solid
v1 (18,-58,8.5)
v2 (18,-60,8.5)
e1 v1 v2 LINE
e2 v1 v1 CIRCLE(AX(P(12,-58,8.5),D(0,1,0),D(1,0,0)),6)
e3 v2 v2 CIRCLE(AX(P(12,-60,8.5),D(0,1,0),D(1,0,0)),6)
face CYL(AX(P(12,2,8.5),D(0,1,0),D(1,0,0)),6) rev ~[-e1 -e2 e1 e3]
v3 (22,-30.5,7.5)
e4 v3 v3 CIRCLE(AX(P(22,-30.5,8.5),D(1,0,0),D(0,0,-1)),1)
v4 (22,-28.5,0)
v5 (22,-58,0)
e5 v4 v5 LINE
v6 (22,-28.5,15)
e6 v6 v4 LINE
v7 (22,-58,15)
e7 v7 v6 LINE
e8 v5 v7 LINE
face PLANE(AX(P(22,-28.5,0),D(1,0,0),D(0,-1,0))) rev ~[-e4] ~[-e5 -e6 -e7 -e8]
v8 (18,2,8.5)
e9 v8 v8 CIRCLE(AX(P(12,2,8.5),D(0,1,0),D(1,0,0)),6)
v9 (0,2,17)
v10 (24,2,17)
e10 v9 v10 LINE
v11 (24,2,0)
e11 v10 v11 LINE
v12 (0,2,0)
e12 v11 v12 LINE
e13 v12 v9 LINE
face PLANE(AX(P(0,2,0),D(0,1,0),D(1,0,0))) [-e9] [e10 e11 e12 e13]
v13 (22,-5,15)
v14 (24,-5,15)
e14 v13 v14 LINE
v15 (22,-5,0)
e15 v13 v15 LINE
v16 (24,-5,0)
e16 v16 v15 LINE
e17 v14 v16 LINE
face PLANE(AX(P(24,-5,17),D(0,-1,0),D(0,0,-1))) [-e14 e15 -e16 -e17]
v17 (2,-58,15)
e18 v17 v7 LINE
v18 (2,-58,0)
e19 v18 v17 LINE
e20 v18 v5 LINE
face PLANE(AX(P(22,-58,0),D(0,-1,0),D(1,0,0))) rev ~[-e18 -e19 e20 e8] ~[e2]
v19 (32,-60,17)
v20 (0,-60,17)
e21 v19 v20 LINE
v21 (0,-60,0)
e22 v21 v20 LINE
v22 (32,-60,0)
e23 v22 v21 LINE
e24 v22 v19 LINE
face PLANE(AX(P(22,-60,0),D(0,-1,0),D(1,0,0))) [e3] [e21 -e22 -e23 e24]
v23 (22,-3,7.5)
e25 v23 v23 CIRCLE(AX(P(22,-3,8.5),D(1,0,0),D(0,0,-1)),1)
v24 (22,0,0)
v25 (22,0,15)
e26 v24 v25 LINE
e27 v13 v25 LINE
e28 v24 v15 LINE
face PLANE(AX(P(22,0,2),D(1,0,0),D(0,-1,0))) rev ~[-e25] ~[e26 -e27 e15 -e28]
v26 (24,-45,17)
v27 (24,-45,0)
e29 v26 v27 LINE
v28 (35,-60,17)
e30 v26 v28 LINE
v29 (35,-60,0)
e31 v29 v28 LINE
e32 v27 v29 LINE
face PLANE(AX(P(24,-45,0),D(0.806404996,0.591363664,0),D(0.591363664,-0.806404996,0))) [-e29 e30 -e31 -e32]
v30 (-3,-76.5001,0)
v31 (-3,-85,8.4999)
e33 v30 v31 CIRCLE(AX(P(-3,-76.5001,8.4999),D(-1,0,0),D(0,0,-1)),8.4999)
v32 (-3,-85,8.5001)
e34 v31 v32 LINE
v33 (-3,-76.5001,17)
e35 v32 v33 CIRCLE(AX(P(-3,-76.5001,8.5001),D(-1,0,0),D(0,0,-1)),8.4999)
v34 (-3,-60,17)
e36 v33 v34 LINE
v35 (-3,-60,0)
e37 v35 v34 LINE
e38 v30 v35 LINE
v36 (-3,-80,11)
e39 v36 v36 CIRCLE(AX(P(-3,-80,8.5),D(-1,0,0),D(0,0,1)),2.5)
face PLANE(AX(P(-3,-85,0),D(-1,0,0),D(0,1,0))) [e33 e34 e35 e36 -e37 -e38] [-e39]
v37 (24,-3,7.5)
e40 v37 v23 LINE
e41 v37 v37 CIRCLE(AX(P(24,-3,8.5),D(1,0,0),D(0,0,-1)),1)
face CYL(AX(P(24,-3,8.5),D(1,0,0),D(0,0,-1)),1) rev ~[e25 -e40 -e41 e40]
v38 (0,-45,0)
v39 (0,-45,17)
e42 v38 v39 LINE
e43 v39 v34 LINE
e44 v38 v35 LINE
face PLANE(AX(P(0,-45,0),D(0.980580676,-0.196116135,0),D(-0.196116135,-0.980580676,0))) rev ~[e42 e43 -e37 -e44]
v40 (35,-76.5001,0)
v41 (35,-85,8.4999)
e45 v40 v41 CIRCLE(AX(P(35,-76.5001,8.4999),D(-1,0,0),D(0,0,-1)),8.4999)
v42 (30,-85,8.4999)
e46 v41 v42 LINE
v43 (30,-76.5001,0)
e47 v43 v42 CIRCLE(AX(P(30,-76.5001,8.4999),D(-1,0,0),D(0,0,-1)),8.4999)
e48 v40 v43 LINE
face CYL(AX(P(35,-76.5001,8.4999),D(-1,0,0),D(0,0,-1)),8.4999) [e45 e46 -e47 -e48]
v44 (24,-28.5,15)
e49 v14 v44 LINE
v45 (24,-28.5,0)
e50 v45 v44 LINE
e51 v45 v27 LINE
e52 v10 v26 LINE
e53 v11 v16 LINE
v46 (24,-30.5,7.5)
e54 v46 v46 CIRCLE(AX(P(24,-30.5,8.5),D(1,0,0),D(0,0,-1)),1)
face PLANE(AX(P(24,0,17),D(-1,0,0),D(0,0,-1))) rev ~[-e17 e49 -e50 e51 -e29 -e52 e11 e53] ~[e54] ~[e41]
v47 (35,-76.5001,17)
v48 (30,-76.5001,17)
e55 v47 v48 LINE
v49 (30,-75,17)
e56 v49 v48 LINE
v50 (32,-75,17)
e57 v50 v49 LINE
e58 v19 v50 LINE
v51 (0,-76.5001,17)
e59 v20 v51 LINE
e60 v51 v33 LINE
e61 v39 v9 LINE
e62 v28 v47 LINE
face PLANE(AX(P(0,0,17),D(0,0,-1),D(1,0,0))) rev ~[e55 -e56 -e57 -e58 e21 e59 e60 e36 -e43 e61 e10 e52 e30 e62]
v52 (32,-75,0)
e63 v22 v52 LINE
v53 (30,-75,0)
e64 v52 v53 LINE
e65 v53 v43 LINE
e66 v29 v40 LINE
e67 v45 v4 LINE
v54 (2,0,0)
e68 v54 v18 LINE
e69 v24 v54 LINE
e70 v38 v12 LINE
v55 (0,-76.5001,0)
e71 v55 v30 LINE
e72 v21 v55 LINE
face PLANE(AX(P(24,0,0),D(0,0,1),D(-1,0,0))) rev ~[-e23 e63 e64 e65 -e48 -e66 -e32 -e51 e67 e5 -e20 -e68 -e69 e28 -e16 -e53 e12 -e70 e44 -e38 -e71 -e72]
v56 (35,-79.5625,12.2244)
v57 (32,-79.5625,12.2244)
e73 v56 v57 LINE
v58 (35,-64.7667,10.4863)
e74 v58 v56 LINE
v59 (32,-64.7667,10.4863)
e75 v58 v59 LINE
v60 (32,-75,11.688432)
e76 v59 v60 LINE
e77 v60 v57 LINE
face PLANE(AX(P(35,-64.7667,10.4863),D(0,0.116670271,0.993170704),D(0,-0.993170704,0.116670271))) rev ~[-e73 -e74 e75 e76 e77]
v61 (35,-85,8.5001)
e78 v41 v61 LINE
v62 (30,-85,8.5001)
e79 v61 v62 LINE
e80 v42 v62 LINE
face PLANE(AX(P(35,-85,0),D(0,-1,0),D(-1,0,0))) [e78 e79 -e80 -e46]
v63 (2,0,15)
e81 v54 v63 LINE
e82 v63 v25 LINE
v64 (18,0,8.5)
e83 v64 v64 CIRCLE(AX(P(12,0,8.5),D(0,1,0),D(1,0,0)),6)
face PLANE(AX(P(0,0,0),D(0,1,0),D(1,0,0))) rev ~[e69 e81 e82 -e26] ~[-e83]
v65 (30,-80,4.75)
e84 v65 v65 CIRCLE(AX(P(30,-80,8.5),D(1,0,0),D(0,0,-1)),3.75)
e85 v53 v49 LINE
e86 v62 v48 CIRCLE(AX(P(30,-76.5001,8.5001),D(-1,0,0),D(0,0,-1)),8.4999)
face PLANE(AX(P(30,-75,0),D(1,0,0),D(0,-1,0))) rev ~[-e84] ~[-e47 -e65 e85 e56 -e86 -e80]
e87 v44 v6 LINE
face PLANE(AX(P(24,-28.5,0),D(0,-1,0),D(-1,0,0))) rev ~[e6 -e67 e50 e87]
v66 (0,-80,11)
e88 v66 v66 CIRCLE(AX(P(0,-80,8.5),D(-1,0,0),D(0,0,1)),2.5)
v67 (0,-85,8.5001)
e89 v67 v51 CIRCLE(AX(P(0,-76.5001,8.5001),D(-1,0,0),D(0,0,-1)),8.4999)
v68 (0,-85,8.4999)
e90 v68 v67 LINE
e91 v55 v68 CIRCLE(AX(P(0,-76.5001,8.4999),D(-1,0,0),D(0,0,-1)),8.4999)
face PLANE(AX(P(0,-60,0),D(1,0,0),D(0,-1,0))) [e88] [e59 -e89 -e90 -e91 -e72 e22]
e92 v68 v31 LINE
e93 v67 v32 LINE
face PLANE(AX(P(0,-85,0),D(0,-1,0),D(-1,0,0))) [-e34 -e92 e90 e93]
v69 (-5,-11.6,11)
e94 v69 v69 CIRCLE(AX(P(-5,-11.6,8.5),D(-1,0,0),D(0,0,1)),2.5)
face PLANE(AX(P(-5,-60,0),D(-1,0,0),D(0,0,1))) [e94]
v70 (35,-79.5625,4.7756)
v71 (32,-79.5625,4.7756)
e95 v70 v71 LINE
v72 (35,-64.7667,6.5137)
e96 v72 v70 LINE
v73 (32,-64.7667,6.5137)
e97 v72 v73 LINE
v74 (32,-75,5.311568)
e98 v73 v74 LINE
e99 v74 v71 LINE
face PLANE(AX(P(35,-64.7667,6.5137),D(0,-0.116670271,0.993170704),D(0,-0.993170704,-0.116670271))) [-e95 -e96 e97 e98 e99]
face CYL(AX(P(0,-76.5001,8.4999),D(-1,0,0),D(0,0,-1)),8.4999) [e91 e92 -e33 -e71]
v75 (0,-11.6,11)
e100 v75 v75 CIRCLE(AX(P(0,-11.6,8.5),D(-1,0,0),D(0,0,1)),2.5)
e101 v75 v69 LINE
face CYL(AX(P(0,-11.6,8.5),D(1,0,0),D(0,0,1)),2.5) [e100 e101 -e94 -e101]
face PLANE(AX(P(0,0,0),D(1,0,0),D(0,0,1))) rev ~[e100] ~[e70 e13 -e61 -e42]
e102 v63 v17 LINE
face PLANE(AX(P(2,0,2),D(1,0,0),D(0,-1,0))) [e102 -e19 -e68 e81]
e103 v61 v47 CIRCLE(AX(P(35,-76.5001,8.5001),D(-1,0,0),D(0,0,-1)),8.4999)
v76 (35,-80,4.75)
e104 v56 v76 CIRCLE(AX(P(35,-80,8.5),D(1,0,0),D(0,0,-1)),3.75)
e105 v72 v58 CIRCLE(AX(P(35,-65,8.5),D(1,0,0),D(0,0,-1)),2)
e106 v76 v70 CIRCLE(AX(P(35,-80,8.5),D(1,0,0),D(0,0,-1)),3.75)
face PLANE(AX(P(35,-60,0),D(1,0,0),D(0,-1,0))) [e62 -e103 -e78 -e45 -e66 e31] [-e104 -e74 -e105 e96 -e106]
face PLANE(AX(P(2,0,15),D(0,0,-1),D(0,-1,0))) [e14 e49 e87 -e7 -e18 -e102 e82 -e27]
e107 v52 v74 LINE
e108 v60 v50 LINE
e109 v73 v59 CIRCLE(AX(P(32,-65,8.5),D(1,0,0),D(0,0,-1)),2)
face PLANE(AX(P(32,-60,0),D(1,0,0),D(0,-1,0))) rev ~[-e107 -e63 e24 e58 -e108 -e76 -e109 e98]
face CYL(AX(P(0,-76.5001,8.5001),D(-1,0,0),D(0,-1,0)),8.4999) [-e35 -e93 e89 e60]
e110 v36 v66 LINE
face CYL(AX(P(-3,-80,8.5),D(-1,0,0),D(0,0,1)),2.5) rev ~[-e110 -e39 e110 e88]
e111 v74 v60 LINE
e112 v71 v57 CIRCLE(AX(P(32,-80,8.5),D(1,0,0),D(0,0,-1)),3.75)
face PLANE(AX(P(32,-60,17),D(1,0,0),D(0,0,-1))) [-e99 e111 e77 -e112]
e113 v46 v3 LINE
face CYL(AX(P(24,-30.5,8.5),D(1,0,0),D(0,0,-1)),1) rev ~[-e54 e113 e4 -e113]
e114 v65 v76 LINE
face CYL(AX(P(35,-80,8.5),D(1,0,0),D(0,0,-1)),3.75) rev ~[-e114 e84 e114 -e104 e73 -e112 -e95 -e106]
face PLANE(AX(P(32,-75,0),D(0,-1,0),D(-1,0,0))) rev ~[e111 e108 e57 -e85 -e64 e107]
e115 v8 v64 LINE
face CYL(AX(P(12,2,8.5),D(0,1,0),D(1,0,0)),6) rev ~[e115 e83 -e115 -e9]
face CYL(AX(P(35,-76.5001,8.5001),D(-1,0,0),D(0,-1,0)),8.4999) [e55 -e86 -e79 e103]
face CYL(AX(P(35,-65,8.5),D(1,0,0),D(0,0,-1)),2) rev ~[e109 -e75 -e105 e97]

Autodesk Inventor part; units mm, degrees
ref_plane "YZ Plane" through (0, 0, 0) normal (1, 0, 0) x (0, 1, 0)
ref_plane "XZ Plane" through (0, 0, 0) normal (0, 1, 0) x (-1, 0, 0)
ref_plane "XY Plane" through (0, 0, 0) normal (0, 0, 1) x (1, 0, 0)
sketch "Sketch1" plane through (0, 0, 0) normal (0, 0, 1) x (1, 0, 0)
  line L0 (0, 0) -> (24, 0)
  line L1 (24, 0) -> (24, -60)
  line L2 (24, -60) -> (0, -60)
  line L3 (0, -60) -> (0, 0)
  dimension "d0" = 24
  dimension "d1" = 60
extrude "Extrusion1" add sketch "Sketch1" along normal blind 2
sketch "Sketch2" plane through (0, 0, 2) normal (0, 0, 1) x (1, 0, 0)
  line L0 (0, -60) -> (24, -60) projected
  line L1 (0, 0) -> (2, 0)
  line L2 (2, 0) -> (2, -60)
  line L3 (2, -60) -> (0, -60)
  line L4 (0, -60) -> (0, 0)
  line L5 (24, -60) -> (24, 0) projected
  line L6 (24, 0) -> (22, 0)
  line L7 (22, 0) -> (22, -60)
  line L8 (22, -60) -> (24, -60)
  line L9 (24, -60) -> (24, 0)
  dimension "d4" = 2
  dimension "d5" = 2
extrude "Extrusion2" add sketch "Sketch2" along normal blind 15
sketch "Sketch3" plane through (24, -60, 0) normal (1, 0, 0) x (0, 0, -1)
  circle A0 centre (-8.5, 57) radius 1
  circle A1 centre (-8.5, 29.5) radius 1
  line L0 (-17, 0) -> (-17, 60) projected
  line L1 (0, 60) -> (-17, 60) projected
  dimension "d8" = 2
  dimension "d9" = 2
  dimension "d10" = 8.5
  dimension "d11" = 8.5
  dimension "d12" = 27.5
  dimension "d13" = 3
extrude "Extrusion3" cut sketch "Sketch3" against normal up to surface (2 mm away)
sketch "Sketch4" plane through (24, -60, 0) normal (1, 0, 0) x (0, 0, -1)
  line L0 (-17, 60) -> (-17, 0) projected
  line L1 (-17, 55) -> (-2, 55)
  line L2 (-2, 55) -> (-2, 31.5)
  line L3 (-2, 31.5) -> (-17, 31.5)
  line L4 (-17, 31.5) -> (-17, 55)
  circle A0 centre (-8.5, 57) radius 1 projected
  circle A1 centre (-8.5, 29.5) radius 1 projected
  point P0 (-17, 31.5)
  dimension "d23" = 15
  dimension "d24" = 23.5
  dimension "d25" = 2
  dimension "d26" = 2
extrude "Extrusion4" cut sketch "Sketch4" against normal up to surface (2 mm away) contours L1 L2 L3 L0
sketch "Sketch5" plane through (0, -60, 0) normal (-1, 0, 0) x (0, 0, 1)
  circle A0 centre (8.5, 48.4) radius 2.5
  circle A1 centre (8.5, 57) radius 1 projected
  point P0 (0, 60)
  dimension "d29" = 5
  dimension "d32" = 8.6
  dimension "d33" = 0
extrude "Extrusion5" add sketch "Sketch5" along normal blind 5 contours A0
sketch "Sketch12" plane through (0, 0, 0) normal (0, 0, -1) x (-1, 0, 0)
  line L0 (3, -60) -> (-35, -60)
  line L1 (-35, -60) -> (-35, -85)
  line L2 (-35, -85) -> (3, -85)
  line L3 (3, -85) -> (3, -60)
  line L4 (0, 0) -> (0, -60) projected
  line L5 (-2, -60) -> (-22, -60) projected
  line L6 (3, -60) -> (0, -60)
  line L7 (0, -60) -> (0, -85)
  line L8 (0, -85) -> (3, -85)
  line L9 (3, -85) -> (3, -60)
  line L10 (-35, -60) -> (-30, -60)
  line L11 (-30, -60) -> (-30, -85)
  line L12 (-30, -85) -> (-35, -85)
  line L13 (-35, -85) -> (-35, -60)
  line L14 (-30, -60) -> (-32, -60)
  line L15 (-32, -60) -> (-32, -75)
  line L16 (-32, -75) -> (-30, -75)
  line L17 (-30, -75) -> (-30, -60)
  dimension "d51" = 38
  dimension "d52" = 3
  dimension "d53" = 25
  dimension "d54" = 0
  dimension "d55" = 3
  dimension "d56" = 5
  dimension "d95" = 2
  dimension "d96" = 15
extrude "Extrusion9" add sketch "Sketch12" against normal up to surface (17 mm away) contours L3 L2 L7 L0 | L2 L1 L0 L15 L16 L11
sketch "Sketch13" plane through (0, 0, 0) normal (0, 0, -1) x (-1, 0, 0)
  line L0 (-32, -60) -> (-35, -60) projected
  line L1 (0, -60) -> (-24, -60) projected
  line L2 (-35, -60) -> (-24, -60)
  line L3 (-24, -60) -> (-24, -45)
  line L4 (-24, -45) -> (-35, -60)
  line L5 (0, -60) -> (0, -45)
  line L6 (0, 0) -> (0, -60) projected
  line L7 (0, -60) -> (15, -60) construction
  line L8 (0, -45) -> (3, -60)
  line L9 (3, -60) -> (0, -60)
  point P0 (-30, -60)
  dimension "d59" = 15
  dimension "d60" = 90
  dimension "d63" = 15
  dimension "d64" = 90
extrude "Extrusion10" add sketch "Sketch13" against normal up to surface (17 mm away)
sketch "Sketch14" plane through (-3, -85, 0) normal (-1, 0, 0) x (0, 0, 1)
  circle A0 centre (8.5, 5) radius 2.5
  line L0 (17, 0) -> (17, 25) projected
  line L1 (0, 25) -> (17, 25) projected
  point P0 (0, 85)
  dimension "d65" = 5
  dimension "d66" = 8.5
  dimension "d67" = 20
extrude "Extrusion11" cut sketch "Sketch14" against normal up to surface (38 mm away)
sketch "Sketch15" plane through (2, -60, 2) normal (1, 0, 0) x (0, 0, -1)
  line L0 (2, 0) -> (-15, 0) projected
  line L1 (-15, 60) -> (-13, 60)
  line L2 (-13, 60) -> (-13, 0)
  line L3 (-13, 0) -> (-15, 0)
  line L4 (-15, 0) -> (-15, 60)
  point P0 (2, 60)
  dimension "d70" = 2
extrude "Extrusion12" add sketch "Sketch15" along normal up to surface (22 mm away)
sketch "Sketch16" plane through (0, 0, 0) normal (0, 0, -1) x (-1, 0, 0)
  line L0 (-2, 0) -> (-2, -60) projected
  line L1 (-2, -60) -> (-22, -60) projected
  line L2 (-2, 0) -> (-22, 0)
  line L3 (-22, 0) -> (-22, -60)
  line L4 (-22, -60) -> (-2, -60)
  line L5 (-2, -60) -> (-2, 0)
  line L6 (-24, -45) -> (-24, 0) projected
  line L7 (-24, -28.5) -> (-22, -28.5) projected
  line L8 (-24, -5) -> (-22, -5)
  line L9 (-22, -5) -> (-22, -28.5)
  line L10 (-22, -28.5) -> (-24, -28.5)
  line L11 (-24, -28.5) -> (-24, -5)
  point P0 (0, 0)
extrude "Extrusion14" cut sketch "Sketch16" against normal up to surface (2 mm away)
sketch "Sketch17" plane through (22, -60, 0) normal (0, -1, 0) x (1, 0, 0)
  line L0 (-20, 2) -> (-20, 15) projected
  line L1 (-20, 15) -> (0, 15) projected
  line L2 (-20, 0) -> (0, 0)
  line L3 (0, 0) -> (0, 15)
  line L4 (0, 15) -> (-20, 15)
  line L5 (-20, 15) -> (-20, 0)
  point P0 (-22, 0)
  point P1 (-20, 2)
extrude "Extrusion15" add sketch "Sketch17" against normal blind 2
sketch "Sketch18" plane through (0, 0, 0) normal (0, 1, 0) x (1, 0, 0)
  line L0 (0, 0) -> (0, -17) projected
  line L1 (24, -17) -> (24, 0) projected
  line L2 (0, -17) -> (24, -17)
  line L3 (24, -17) -> (24, 0)
  line L4 (24, 0) -> (0, 0)
  line L5 (0, 0) -> (0, -17)
extrude "Extrusion16" add sketch "Sketch18" along normal blind 2
sketch "Sketch19" plane through (0, 2, 0) normal (0, 1, 0) x (1, 0, 0)
  circle A0 centre (12, -8.5) radius 6
  line L0 (0, 0) -> (0, -17) projected
  line L1 (0, -17) -> (24, -17) projected
  dimension "d81" = 12
  dimension "d82" = 12
  dimension "d83" = 8.5
extrude "Extrusion17" cut sketch "Sketch19" against normal up to surface (62 mm away)
sketch "Sketch20" plane through (35, -85, 17) normal (1, 0, 0) x (0, 0, -1)
  circle A0 centre (8.5, 5) radius 2.5 projected
  circle A1 centre (8.5, 5) radius 3.75
  point P0 (17, 85)
  dimension "d86" = 7.5
extrude "Extrusion18" cut sketch "Sketch20" against normal up to surface (5 mm away)
fillet "Fillet2" radius 8.5 4 edges at (-1.5, -85, 0) (-1.5, -85, 17) (32.5, -85, 0) (32.5, -85, 17)
sketch "Sketch21" plane through (35, -60, 17) normal (1, 0, 0) x (0, 0, -1)
  circle A0 centre (8.5, -20) radius 3.75 projected
  circle A1 centre (8.5, -20) radius 3.75
  circle A2 centre (8.5, -5) radius 2
  circle A3 centre (8.5, -20) radius 3.75
  line L0 (10.4863, -4.7667) -> (12.2244, -19.5625)
  line L1 (6.5137, -4.7667) -> (4.7756, -19.5625)
  point P0 (17, 60)
  point P1 (4.7756, -19.5625)
  point P2 (12.2244, -19.5625)
  dimension "d90" = 4
  dimension "d91" = 15
  dimension "d92" = 0
extrude "Extrusion19" cut sketch "Sketch21" against normal blind 3
properties part number "juncao5"
